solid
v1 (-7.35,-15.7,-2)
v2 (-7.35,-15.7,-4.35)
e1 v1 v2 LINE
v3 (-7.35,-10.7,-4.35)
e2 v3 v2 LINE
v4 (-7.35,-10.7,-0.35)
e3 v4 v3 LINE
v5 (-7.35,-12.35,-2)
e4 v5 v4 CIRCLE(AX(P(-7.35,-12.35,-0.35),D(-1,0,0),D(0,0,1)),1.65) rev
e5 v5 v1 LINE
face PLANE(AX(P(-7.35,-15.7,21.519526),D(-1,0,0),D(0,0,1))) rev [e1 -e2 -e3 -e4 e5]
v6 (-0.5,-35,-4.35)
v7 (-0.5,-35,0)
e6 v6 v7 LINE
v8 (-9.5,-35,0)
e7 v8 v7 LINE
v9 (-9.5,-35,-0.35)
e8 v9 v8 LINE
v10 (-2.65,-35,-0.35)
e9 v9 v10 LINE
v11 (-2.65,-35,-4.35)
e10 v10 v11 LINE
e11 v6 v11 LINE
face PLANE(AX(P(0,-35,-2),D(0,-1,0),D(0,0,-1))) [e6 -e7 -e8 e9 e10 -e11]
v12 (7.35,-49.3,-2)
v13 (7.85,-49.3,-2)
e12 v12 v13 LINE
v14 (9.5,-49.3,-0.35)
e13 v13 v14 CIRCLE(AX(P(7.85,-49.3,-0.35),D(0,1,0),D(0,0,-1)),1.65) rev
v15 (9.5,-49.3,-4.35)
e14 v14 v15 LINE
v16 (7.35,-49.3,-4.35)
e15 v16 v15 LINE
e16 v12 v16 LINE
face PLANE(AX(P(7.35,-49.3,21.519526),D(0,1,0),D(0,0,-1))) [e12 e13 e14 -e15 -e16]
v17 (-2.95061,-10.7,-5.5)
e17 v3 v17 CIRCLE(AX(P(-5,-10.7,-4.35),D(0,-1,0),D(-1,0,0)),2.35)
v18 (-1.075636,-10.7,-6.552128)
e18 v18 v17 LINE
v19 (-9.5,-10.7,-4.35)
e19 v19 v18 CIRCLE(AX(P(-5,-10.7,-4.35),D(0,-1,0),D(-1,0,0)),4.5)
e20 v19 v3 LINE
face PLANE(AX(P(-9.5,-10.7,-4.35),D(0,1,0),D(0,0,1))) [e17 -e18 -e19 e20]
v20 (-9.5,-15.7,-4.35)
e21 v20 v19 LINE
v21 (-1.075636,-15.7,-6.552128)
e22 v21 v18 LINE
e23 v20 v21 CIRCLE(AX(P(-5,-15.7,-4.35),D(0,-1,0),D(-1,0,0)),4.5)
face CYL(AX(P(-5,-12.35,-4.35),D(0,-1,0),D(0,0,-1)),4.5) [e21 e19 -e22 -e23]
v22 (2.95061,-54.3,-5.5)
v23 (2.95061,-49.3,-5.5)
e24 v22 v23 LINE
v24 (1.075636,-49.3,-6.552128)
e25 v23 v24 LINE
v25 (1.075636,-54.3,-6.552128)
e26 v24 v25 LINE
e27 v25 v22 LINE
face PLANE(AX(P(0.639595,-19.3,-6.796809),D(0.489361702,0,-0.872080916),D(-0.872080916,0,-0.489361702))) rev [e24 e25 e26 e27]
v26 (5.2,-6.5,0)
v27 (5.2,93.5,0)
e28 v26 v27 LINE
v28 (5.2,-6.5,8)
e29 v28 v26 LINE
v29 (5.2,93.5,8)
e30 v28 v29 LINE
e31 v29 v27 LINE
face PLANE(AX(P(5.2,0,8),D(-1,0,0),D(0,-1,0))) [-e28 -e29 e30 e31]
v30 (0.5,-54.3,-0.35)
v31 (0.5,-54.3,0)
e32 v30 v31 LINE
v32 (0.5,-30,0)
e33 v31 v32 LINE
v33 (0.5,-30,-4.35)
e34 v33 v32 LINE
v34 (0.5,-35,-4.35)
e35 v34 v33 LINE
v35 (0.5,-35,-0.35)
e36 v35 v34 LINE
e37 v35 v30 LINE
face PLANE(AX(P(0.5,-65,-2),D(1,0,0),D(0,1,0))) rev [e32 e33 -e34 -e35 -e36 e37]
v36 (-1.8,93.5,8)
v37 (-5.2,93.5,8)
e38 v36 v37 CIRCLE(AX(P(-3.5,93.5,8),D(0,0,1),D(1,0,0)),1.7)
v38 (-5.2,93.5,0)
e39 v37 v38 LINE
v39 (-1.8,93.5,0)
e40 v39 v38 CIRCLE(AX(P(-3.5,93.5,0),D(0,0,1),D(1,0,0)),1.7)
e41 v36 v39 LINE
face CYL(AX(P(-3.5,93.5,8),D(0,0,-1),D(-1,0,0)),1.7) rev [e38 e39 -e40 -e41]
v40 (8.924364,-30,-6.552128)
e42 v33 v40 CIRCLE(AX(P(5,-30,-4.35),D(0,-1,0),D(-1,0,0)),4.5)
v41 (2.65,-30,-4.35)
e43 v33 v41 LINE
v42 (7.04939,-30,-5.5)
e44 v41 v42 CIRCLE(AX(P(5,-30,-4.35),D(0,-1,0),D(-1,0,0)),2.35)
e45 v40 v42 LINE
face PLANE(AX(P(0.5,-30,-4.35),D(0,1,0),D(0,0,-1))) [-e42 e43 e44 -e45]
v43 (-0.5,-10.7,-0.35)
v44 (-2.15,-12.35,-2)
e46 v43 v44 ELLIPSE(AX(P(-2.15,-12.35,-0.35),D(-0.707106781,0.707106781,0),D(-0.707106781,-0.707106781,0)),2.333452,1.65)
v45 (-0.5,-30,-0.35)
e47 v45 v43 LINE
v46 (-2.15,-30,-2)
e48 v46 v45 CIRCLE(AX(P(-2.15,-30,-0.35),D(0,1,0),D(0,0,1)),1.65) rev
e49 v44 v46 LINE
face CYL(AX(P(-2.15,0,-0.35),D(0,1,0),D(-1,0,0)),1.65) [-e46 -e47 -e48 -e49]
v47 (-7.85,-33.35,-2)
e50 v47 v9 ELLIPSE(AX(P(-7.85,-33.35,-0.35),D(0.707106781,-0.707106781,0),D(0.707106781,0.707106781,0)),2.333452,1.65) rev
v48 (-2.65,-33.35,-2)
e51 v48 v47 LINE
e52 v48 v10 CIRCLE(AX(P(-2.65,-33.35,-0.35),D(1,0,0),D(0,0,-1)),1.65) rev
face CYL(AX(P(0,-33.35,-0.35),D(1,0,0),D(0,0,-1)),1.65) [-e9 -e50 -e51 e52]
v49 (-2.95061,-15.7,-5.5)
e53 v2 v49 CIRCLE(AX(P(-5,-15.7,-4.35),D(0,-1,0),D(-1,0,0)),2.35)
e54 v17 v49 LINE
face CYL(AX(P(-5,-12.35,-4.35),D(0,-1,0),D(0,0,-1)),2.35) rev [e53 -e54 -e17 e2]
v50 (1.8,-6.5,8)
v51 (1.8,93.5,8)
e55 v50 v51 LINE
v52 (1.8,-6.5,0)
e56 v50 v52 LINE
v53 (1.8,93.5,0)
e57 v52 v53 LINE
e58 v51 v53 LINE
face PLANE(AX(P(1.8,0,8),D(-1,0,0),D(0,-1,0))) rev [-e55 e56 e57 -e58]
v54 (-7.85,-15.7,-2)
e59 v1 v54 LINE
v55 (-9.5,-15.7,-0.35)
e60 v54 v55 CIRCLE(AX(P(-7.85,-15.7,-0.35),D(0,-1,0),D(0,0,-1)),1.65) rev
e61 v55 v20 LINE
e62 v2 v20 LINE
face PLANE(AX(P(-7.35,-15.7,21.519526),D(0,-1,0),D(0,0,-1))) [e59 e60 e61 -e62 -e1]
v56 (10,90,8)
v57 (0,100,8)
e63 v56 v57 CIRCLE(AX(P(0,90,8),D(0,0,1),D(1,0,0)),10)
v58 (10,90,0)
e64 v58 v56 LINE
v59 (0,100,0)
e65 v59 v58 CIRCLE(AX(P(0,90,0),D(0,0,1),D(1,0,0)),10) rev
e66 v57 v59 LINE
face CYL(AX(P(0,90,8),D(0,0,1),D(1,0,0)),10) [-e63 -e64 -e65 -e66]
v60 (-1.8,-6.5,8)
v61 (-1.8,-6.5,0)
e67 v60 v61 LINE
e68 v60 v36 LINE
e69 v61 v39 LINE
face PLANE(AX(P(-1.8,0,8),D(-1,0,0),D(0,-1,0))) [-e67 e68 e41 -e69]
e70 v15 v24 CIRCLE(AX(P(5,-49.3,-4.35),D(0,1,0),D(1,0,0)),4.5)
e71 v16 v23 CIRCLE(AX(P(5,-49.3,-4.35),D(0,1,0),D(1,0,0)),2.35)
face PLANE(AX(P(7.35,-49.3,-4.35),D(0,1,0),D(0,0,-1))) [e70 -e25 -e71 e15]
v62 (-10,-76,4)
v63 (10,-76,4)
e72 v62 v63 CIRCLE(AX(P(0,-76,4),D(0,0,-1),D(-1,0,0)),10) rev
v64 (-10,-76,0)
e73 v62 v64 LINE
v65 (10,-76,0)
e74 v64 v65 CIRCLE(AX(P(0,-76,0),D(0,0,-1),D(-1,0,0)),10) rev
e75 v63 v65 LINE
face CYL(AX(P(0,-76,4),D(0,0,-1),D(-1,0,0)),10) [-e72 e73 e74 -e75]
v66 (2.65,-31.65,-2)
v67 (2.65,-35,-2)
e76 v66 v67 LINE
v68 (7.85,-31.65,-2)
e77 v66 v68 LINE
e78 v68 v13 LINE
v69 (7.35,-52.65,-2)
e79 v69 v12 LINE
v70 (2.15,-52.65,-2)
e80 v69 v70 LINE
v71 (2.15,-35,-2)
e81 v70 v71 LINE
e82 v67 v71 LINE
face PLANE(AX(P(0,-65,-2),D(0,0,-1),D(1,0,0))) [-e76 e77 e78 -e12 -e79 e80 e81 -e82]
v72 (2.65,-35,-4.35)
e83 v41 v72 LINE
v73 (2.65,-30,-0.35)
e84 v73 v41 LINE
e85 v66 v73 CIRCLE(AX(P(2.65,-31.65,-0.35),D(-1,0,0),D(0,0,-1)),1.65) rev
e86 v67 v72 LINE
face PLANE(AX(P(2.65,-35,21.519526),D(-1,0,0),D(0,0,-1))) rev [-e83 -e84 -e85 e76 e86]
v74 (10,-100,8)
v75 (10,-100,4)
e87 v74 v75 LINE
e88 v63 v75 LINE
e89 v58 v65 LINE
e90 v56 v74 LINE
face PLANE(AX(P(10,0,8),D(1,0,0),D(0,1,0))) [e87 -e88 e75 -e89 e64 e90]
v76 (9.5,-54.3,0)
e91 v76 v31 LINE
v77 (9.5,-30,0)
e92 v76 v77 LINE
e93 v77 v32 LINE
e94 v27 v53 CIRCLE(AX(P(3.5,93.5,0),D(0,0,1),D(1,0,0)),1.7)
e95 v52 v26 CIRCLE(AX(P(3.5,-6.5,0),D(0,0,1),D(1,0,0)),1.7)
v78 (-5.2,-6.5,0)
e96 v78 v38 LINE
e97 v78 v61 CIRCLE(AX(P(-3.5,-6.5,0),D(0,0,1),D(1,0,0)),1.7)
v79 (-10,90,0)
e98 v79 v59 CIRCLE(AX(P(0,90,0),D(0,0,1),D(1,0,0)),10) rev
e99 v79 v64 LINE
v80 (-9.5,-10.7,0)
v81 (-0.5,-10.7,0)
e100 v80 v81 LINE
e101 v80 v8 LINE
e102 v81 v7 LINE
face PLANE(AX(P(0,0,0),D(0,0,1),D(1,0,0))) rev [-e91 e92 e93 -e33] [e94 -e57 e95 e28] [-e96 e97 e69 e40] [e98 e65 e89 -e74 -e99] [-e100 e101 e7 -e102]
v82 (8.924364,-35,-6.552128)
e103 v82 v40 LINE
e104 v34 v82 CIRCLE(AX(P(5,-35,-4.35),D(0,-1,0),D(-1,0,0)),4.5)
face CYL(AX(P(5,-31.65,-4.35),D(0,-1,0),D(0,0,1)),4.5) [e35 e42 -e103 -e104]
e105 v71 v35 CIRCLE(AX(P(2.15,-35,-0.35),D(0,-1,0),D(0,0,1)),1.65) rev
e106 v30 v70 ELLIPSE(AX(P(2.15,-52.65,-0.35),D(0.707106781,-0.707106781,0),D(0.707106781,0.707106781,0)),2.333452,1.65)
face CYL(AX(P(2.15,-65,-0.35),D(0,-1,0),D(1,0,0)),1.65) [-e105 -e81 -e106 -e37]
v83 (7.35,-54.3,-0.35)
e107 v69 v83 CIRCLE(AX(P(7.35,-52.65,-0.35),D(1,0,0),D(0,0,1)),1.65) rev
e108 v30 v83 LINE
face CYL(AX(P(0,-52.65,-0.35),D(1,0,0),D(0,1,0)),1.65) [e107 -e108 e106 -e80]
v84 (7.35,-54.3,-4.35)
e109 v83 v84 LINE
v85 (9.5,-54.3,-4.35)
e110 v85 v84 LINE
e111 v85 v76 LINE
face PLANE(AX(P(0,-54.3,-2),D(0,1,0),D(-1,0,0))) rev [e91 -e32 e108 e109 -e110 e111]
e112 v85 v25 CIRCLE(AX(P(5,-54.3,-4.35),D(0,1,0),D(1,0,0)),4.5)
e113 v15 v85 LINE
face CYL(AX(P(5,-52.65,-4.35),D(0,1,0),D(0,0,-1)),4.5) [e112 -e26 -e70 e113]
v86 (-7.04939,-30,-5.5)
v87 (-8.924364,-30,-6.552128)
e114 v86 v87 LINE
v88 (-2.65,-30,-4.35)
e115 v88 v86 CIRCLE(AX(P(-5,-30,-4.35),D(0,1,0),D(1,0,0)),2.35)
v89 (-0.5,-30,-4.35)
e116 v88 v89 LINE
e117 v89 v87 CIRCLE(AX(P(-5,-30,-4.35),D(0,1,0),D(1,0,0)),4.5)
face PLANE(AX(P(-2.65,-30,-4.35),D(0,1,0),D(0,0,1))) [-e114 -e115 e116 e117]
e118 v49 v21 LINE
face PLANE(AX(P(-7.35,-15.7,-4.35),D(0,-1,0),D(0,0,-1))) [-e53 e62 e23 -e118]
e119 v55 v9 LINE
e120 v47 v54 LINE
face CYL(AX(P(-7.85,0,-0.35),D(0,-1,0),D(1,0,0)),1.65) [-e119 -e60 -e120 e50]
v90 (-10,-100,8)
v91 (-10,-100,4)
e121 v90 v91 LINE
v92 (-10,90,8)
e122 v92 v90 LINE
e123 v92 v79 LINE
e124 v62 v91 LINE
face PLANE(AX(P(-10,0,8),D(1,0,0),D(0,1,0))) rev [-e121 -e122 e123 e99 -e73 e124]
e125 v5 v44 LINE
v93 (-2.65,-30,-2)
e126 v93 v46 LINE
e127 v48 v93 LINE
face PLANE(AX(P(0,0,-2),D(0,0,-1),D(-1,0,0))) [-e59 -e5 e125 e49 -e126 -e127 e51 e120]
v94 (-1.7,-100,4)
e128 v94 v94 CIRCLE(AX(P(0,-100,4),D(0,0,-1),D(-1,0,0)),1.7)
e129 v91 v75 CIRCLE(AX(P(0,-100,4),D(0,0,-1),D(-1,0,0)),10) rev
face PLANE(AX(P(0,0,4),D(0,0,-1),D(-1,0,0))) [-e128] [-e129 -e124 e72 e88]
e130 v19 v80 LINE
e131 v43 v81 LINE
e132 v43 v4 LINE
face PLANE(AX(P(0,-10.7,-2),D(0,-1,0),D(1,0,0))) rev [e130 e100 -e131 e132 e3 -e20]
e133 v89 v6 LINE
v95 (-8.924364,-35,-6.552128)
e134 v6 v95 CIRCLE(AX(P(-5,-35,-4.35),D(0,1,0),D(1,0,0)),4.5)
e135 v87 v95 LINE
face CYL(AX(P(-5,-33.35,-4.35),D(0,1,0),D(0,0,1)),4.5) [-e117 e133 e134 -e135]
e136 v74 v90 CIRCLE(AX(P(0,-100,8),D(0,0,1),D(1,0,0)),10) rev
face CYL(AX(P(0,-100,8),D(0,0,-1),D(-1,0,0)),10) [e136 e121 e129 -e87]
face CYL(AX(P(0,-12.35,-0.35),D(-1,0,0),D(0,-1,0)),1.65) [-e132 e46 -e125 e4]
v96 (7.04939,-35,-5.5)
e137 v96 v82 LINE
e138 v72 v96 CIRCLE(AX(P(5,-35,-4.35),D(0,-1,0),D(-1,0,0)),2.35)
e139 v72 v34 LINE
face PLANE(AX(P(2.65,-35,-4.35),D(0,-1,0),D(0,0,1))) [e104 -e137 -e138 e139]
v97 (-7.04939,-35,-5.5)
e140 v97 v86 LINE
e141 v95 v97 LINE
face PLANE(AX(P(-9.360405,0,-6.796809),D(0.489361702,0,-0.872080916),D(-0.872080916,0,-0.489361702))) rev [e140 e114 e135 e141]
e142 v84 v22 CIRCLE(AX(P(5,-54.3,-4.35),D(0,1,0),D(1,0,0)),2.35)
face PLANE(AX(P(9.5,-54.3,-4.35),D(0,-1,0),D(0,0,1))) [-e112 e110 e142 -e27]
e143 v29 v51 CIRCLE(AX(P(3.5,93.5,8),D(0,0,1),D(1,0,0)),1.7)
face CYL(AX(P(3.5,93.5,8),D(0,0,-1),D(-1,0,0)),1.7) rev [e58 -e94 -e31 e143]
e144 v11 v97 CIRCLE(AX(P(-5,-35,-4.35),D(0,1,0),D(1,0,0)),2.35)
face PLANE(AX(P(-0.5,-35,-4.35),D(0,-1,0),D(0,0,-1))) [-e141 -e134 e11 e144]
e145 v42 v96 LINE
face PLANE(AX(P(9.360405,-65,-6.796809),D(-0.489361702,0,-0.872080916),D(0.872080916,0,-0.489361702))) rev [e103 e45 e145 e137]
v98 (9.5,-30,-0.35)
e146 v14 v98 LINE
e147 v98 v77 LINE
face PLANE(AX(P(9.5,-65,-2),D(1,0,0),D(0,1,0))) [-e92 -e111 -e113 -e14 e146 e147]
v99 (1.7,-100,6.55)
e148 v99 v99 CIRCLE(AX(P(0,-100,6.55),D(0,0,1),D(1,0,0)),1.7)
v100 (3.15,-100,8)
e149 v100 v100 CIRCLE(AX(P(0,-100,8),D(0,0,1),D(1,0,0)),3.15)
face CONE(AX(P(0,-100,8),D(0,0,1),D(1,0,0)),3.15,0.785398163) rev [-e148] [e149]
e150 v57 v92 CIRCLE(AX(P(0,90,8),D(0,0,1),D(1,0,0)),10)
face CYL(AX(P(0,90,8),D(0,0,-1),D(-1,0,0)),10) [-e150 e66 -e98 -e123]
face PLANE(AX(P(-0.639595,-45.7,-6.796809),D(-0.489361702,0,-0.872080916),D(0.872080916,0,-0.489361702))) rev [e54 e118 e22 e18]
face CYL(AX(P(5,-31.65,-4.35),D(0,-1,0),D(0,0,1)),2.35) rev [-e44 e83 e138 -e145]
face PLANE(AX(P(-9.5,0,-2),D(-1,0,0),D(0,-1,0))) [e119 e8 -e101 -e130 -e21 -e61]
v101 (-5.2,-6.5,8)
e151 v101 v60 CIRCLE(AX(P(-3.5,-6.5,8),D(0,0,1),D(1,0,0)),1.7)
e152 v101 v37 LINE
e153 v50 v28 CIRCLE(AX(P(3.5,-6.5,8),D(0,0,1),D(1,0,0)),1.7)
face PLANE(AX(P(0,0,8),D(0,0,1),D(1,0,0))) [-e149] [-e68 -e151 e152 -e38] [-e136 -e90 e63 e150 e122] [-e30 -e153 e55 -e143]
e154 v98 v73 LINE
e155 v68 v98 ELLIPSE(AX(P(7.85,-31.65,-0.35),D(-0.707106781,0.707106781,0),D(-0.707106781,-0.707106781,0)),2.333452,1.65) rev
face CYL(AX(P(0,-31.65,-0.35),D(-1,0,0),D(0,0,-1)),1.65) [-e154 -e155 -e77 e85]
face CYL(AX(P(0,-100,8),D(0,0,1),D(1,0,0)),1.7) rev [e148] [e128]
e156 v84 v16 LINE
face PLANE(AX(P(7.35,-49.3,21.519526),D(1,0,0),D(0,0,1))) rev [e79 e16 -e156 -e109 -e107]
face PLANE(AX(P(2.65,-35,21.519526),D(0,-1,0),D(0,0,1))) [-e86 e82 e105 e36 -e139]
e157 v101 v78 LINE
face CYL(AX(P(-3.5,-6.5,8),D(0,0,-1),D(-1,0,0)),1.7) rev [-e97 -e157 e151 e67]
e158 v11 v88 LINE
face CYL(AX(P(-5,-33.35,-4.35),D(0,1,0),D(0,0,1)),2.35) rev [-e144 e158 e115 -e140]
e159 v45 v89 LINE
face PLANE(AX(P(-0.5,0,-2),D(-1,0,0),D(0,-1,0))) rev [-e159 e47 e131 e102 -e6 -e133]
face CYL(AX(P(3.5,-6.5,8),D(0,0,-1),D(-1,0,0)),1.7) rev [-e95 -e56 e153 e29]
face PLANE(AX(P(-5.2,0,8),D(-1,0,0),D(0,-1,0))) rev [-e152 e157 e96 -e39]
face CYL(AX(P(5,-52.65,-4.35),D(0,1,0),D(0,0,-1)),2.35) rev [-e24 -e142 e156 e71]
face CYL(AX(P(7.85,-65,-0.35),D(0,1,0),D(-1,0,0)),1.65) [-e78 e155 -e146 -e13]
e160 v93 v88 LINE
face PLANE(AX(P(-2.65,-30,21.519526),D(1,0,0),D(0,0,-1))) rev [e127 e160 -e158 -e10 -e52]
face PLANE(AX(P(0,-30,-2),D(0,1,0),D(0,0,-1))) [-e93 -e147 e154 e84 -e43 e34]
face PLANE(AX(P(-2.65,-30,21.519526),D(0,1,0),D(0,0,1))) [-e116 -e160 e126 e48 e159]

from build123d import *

# Parameters (mm, degrees)
BOSS_EXTRUDE1_DEPTH                                 = 8
FILLET1_R                                           = 10
CUT_EXTRUDE8_DEPTH                                  = 4
CSK_FOR_M3_COUNTERSUNK_FLAT_HEAD_SCREW2_D           = 3.4
CSK_FOR_M3_COUNTERSUNK_FLAT_HEAD_SCREW2_DEPTH       = 8.5
CSK_FOR_M3_COUNTERSUNK_FLAT_HEAD_SCREW2_CSINK_D     = 6.3
CSK_FOR_M3_COUNTERSUNK_FLAT_HEAD_SCREW2_CSINK_ANGLE = 90
CSK_FOR_M3_COUNTERSUNK_FLAT_HEAD_SCREW2_TIP         = 1.021463052
SKETCH14_W                                          = 9
SKETCH14_H                                          = 24.3
BOSS_EXTRUDE2_DEPTH                                 = 2
FILLET3_R                                           = 1.65
BOSS_EXTRUDE3_REACH                                 = 112.905
SKETCH16_W                                          = 2.15
SKETCH16_H                                          = 5
SKETCH18_W                                          = 2.15
SKETCH18_H                                          = 5
CIRPATTERN1_COUNT                                   = 2
CIRPATTERN2_COUNT                                   = 2
CIRPATTERN2_COPY_1_REACH                            = 112.905
CIRPATTERN2_COPY_1_SKETCH_W                         = 2.15
CIRPATTERN2_COPY_1_SKETCH_H                         = 5
CIRPATTERN2_COPY_2_SKETCH_W                         = 2.15
CIRPATTERN2_COPY_2_SKETCH_H                         = 5
FILLET3_OF_CIRPATTERN2_R                            = 1.65


with BuildPart() as part:
    # Sketch1 → Boss-Extrude1 (new body)
    with BuildSketch(Plane(origin=(0, 0, 0), x_dir=(0, 1, 0), z_dir=(0, 0, 1))):
        with BuildLine():
            Line((100, -10), (-100, -10))
            ThreePointArc((-100, -10), (-110, 0), (-100, 10))
            Line((-100, 10), (100, 10))
            Line((100, 10), (100, -10))
        make_face()
        with BuildLine():
            Line((-6.5, 5.2), (93.5, 5.2))
            ThreePointArc((93.5, 5.2), (95.2, 3.5), (93.5, 1.8))
            Line((93.5, 1.8), (-6.5, 1.8))
            ThreePointArc((-6.5, 1.8), (-8.2, 3.5), (-6.5, 5.2))
        make_face(mode=Mode.SUBTRACT)
        with BuildLine():
            Line((-6.5, -1.8), (93.5, -1.8))
            ThreePointArc((93.5, -1.8), (95.2, -3.5), (93.5, -5.2))
            Line((93.5, -5.2), (-6.5, -5.2))
            ThreePointArc((-6.5, -5.2), (-8.2, -3.5), (-6.5, -1.8))
        make_face(mode=Mode.SUBTRACT)
    extrude(amount=BOSS_EXTRUDE1_DEPTH)

    # Fillet1
    fillet1_edges = [part.edges().sort_by_distance(p)[0] for p in [
        (-10, 100, 4),
        (10, 100, 4),
    ]]
    fillet(fillet1_edges, radius=FILLET1_R - 0.0001)  # a hair under: the kernel refuses the full size

    # Sketch8 → Cut-Extrude8 (cut)
    with BuildSketch(Plane(origin=(0, 0, 0), x_dir=(1, 0, 0), z_dir=(0, 0, -1))):
        with BuildLine():
            Line((-10, 76), (-10, 110))
            Line((-10, 110), (10, 110))
            Line((10, 110), (10, 76))
            ThreePointArc((10, 76), (0, 86), (-10, 76))
        make_face()
    extrude(amount=-CUT_EXTRUDE8_DEPTH, mode=Mode.SUBTRACT)

    # CSK for M3 Countersunk Flat Head Screw2
    with Locations(Plane.XY.offset(8)):
        with Locations((0, -100)):
            CounterSinkHole(CSK_FOR_M3_COUNTERSUNK_FLAT_HEAD_SCREW2_D / 2, CSK_FOR_M3_COUNTERSUNK_FLAT_HEAD_SCREW2_CSINK_D / 2, depth=CSK_FOR_M3_COUNTERSUNK_FLAT_HEAD_SCREW2_DEPTH, counter_sink_angle=CSK_FOR_M3_COUNTERSUNK_FLAT_HEAD_SCREW2_CSINK_ANGLE)
            with Locations((0, 0, -(CSK_FOR_M3_COUNTERSUNK_FLAT_HEAD_SCREW2_DEPTH + CSK_FOR_M3_COUNTERSUNK_FLAT_HEAD_SCREW2_TIP / 2))):  # 118° drill point
                Cone(0, CSK_FOR_M3_COUNTERSUNK_FLAT_HEAD_SCREW2_D / 2, CSK_FOR_M3_COUNTERSUNK_FLAT_HEAD_SCREW2_TIP, mode=Mode.SUBTRACT)

    # Sketch14 → Boss-Extrude2 (add)
    with BuildSketch(Plane.XY):
        with Locations((-5, -22.85)):
            Rectangle(SKETCH14_W, SKETCH14_H)
    boss_extrude2 = extrude(amount=-BOSS_EXTRUDE2_DEPTH)

    # Fillet3
    fillet3_edges = [part.edges().sort_by_distance(p)[0] for p in [
        (-5, -35, -2),
        (-9.5, -22.85, -2),
        (-5, -10.7, -2),
        (-0.5, -22.85, -2),
    ]]
    fillet(fillet3_edges, radius=FILLET3_R)

    # Boss-Extrude3: up to this face of the body (flat: up to its plane)
    boss_extrude3_end = Plane(part.part.faces().sort_by_distance((0.402421267, 0.024510411, 0))[0])
    # Sketch16 → Boss-Extrude3 (add, up to the picked face)
    with BuildSketch(Plane.XY.offset(-2), mode=Mode.PRIVATE) as boss_extrude3_sk1:
        with Locations((-1.575, -32.5)):
            Rectangle(SKETCH16_W, SKETCH16_H)
    boss_extrude3_tool1 = split(extrude(boss_extrude3_sk1.sketch, amount=BOSS_EXTRUDE3_REACH, mode=Mode.PRIVATE), bisect_by=boss_extrude3_end, keep=Keep.BOTH, mode=Mode.PRIVATE)
    boss_extrude3 = boss_extrude3_tool1.solids().sort_by(Axis((-1.575, -32.5, -2), (0, 0, 1)))[0]
    add(boss_extrude3)

    # Sweep3: sweep along a path in Sketch17
    with BuildLine(Plane(origin=(0, -33.35, 0), x_dir=(-1, 0, 0), z_dir=(0, -1, 0))) as sweep3_path:
        Line((2.65, 2), (2.65, 4.35))
        ThreePointArc((2.65, 4.35), (4.405679741, 6.623605821), (7.049390153, 5.5))
    # Sketch18 → Sweep3 (sweep)
    with BuildSketch(Plane.XY.offset(-2)):
        with Locations((-1.575, -32.5)):
            Rectangle(SKETCH18_W, SKETCH18_H)
    sweep3 = sweep(path=sweep3_path.line)

    # CirPattern1: Boss-Extrude3, Sweep3 ×2 about axis
    cirpattern1_axis = Axis((-5, -22.85, 0), (0, 0, 1))
    add([boss_extrude3.rotate(cirpattern1_axis, i * 360 / CIRPATTERN1_COUNT) for i in range(1, CIRPATTERN1_COUNT)])
    add([sweep3.rotate(cirpattern1_axis, i * 360 / CIRPATTERN1_COUNT) for i in range(1, CIRPATTERN1_COUNT)])

    # CirPattern2: Boss-Extrude2, Boss-Extrude3, Sweep3 ×2 about axis
    cirpattern2_axis = Axis((0, -32.5, 0), (0, 0, 1))
    add([boss_extrude2.rotate(cirpattern2_axis, i * 360 / CIRPATTERN2_COUNT) for i in range(1, CIRPATTERN2_COUNT)])
    add([boss_extrude3.rotate(cirpattern2_axis, i * 360 / CIRPATTERN2_COUNT) for i in range(1, CIRPATTERN2_COUNT)])
    add([sweep3.rotate(cirpattern2_axis, i * 360 / CIRPATTERN2_COUNT) for i in range(1, CIRPATTERN2_COUNT)])

    # CirPattern2 copy 1: up to this face of the body (flat: up to its plane)
    cirpattern2_copy_1_end = Plane(part.part.faces().sort_by_distance((10.402421267, -19.275489589, 0))[0])
    # CirPattern2 copy 1 sketch → CirPattern2 copy 1 (add, up to the picked face)
    with BuildSketch(Plane(origin=(10, -19.3, -2), x_dir=(1, 0, 0), z_dir=(0, 0, 1)), mode=Mode.PRIVATE) as cirpattern2_copy_1_sk1:
        with Locations((-1.575, -32.5)):
            Rectangle(CIRPATTERN2_COPY_1_SKETCH_W, CIRPATTERN2_COPY_1_SKETCH_H)
    cirpattern2_copy_1_tool1 = split(extrude(cirpattern2_copy_1_sk1.sketch, amount=CIRPATTERN2_COPY_1_REACH, mode=Mode.PRIVATE), bisect_by=cirpattern2_copy_1_end, keep=Keep.BOTH, mode=Mode.PRIVATE)
    add(cirpattern2_copy_1_tool1.solids().sort_by(Axis((8.425, -51.8, -2), (0, 0, 1)))[0])

    # CirPattern2 copy 2: sweep along a path in CirPattern2 copy 2 path
    with BuildLine(Plane(origin=(10, -52.65, 0), x_dir=(-1, 0, 0), z_dir=(0, -1, 0))) as cirpattern2_copy_2_path:
        Line((2.65, 2), (2.65, 4.35))
        ThreePointArc((2.65, 4.35), (4.405679741, 6.623605821), (7.049390153, 5.5))
    # CirPattern2 copy 2 sketch → CirPattern2 copy 2 (sweep)
    with BuildSketch(Plane(origin=(10, -19.3, -2), x_dir=(1, 0, 0), z_dir=(0, 0, 1))):
        with Locations((-1.575, -32.5)):
            Rectangle(CIRPATTERN2_COPY_2_SKETCH_W, CIRPATTERN2_COPY_2_SKETCH_H)
    sweep(path=cirpattern2_copy_2_path.line)

    # Fillet3 of CirPattern2
    fillet3_of_cirpattern2_edges = [part.edges().sort_by_distance(p)[0] for p in [
        (5, -30, -2),
        (9.5, -42.15, -2),
        (5, -54.3, -2),
        (0.5, -42.15, -2),
    ]]
    fillet(fillet3_of_cirpattern2_edges, radius=FILLET3_OF_CIRPATTERN2_R)


solid = part.part
